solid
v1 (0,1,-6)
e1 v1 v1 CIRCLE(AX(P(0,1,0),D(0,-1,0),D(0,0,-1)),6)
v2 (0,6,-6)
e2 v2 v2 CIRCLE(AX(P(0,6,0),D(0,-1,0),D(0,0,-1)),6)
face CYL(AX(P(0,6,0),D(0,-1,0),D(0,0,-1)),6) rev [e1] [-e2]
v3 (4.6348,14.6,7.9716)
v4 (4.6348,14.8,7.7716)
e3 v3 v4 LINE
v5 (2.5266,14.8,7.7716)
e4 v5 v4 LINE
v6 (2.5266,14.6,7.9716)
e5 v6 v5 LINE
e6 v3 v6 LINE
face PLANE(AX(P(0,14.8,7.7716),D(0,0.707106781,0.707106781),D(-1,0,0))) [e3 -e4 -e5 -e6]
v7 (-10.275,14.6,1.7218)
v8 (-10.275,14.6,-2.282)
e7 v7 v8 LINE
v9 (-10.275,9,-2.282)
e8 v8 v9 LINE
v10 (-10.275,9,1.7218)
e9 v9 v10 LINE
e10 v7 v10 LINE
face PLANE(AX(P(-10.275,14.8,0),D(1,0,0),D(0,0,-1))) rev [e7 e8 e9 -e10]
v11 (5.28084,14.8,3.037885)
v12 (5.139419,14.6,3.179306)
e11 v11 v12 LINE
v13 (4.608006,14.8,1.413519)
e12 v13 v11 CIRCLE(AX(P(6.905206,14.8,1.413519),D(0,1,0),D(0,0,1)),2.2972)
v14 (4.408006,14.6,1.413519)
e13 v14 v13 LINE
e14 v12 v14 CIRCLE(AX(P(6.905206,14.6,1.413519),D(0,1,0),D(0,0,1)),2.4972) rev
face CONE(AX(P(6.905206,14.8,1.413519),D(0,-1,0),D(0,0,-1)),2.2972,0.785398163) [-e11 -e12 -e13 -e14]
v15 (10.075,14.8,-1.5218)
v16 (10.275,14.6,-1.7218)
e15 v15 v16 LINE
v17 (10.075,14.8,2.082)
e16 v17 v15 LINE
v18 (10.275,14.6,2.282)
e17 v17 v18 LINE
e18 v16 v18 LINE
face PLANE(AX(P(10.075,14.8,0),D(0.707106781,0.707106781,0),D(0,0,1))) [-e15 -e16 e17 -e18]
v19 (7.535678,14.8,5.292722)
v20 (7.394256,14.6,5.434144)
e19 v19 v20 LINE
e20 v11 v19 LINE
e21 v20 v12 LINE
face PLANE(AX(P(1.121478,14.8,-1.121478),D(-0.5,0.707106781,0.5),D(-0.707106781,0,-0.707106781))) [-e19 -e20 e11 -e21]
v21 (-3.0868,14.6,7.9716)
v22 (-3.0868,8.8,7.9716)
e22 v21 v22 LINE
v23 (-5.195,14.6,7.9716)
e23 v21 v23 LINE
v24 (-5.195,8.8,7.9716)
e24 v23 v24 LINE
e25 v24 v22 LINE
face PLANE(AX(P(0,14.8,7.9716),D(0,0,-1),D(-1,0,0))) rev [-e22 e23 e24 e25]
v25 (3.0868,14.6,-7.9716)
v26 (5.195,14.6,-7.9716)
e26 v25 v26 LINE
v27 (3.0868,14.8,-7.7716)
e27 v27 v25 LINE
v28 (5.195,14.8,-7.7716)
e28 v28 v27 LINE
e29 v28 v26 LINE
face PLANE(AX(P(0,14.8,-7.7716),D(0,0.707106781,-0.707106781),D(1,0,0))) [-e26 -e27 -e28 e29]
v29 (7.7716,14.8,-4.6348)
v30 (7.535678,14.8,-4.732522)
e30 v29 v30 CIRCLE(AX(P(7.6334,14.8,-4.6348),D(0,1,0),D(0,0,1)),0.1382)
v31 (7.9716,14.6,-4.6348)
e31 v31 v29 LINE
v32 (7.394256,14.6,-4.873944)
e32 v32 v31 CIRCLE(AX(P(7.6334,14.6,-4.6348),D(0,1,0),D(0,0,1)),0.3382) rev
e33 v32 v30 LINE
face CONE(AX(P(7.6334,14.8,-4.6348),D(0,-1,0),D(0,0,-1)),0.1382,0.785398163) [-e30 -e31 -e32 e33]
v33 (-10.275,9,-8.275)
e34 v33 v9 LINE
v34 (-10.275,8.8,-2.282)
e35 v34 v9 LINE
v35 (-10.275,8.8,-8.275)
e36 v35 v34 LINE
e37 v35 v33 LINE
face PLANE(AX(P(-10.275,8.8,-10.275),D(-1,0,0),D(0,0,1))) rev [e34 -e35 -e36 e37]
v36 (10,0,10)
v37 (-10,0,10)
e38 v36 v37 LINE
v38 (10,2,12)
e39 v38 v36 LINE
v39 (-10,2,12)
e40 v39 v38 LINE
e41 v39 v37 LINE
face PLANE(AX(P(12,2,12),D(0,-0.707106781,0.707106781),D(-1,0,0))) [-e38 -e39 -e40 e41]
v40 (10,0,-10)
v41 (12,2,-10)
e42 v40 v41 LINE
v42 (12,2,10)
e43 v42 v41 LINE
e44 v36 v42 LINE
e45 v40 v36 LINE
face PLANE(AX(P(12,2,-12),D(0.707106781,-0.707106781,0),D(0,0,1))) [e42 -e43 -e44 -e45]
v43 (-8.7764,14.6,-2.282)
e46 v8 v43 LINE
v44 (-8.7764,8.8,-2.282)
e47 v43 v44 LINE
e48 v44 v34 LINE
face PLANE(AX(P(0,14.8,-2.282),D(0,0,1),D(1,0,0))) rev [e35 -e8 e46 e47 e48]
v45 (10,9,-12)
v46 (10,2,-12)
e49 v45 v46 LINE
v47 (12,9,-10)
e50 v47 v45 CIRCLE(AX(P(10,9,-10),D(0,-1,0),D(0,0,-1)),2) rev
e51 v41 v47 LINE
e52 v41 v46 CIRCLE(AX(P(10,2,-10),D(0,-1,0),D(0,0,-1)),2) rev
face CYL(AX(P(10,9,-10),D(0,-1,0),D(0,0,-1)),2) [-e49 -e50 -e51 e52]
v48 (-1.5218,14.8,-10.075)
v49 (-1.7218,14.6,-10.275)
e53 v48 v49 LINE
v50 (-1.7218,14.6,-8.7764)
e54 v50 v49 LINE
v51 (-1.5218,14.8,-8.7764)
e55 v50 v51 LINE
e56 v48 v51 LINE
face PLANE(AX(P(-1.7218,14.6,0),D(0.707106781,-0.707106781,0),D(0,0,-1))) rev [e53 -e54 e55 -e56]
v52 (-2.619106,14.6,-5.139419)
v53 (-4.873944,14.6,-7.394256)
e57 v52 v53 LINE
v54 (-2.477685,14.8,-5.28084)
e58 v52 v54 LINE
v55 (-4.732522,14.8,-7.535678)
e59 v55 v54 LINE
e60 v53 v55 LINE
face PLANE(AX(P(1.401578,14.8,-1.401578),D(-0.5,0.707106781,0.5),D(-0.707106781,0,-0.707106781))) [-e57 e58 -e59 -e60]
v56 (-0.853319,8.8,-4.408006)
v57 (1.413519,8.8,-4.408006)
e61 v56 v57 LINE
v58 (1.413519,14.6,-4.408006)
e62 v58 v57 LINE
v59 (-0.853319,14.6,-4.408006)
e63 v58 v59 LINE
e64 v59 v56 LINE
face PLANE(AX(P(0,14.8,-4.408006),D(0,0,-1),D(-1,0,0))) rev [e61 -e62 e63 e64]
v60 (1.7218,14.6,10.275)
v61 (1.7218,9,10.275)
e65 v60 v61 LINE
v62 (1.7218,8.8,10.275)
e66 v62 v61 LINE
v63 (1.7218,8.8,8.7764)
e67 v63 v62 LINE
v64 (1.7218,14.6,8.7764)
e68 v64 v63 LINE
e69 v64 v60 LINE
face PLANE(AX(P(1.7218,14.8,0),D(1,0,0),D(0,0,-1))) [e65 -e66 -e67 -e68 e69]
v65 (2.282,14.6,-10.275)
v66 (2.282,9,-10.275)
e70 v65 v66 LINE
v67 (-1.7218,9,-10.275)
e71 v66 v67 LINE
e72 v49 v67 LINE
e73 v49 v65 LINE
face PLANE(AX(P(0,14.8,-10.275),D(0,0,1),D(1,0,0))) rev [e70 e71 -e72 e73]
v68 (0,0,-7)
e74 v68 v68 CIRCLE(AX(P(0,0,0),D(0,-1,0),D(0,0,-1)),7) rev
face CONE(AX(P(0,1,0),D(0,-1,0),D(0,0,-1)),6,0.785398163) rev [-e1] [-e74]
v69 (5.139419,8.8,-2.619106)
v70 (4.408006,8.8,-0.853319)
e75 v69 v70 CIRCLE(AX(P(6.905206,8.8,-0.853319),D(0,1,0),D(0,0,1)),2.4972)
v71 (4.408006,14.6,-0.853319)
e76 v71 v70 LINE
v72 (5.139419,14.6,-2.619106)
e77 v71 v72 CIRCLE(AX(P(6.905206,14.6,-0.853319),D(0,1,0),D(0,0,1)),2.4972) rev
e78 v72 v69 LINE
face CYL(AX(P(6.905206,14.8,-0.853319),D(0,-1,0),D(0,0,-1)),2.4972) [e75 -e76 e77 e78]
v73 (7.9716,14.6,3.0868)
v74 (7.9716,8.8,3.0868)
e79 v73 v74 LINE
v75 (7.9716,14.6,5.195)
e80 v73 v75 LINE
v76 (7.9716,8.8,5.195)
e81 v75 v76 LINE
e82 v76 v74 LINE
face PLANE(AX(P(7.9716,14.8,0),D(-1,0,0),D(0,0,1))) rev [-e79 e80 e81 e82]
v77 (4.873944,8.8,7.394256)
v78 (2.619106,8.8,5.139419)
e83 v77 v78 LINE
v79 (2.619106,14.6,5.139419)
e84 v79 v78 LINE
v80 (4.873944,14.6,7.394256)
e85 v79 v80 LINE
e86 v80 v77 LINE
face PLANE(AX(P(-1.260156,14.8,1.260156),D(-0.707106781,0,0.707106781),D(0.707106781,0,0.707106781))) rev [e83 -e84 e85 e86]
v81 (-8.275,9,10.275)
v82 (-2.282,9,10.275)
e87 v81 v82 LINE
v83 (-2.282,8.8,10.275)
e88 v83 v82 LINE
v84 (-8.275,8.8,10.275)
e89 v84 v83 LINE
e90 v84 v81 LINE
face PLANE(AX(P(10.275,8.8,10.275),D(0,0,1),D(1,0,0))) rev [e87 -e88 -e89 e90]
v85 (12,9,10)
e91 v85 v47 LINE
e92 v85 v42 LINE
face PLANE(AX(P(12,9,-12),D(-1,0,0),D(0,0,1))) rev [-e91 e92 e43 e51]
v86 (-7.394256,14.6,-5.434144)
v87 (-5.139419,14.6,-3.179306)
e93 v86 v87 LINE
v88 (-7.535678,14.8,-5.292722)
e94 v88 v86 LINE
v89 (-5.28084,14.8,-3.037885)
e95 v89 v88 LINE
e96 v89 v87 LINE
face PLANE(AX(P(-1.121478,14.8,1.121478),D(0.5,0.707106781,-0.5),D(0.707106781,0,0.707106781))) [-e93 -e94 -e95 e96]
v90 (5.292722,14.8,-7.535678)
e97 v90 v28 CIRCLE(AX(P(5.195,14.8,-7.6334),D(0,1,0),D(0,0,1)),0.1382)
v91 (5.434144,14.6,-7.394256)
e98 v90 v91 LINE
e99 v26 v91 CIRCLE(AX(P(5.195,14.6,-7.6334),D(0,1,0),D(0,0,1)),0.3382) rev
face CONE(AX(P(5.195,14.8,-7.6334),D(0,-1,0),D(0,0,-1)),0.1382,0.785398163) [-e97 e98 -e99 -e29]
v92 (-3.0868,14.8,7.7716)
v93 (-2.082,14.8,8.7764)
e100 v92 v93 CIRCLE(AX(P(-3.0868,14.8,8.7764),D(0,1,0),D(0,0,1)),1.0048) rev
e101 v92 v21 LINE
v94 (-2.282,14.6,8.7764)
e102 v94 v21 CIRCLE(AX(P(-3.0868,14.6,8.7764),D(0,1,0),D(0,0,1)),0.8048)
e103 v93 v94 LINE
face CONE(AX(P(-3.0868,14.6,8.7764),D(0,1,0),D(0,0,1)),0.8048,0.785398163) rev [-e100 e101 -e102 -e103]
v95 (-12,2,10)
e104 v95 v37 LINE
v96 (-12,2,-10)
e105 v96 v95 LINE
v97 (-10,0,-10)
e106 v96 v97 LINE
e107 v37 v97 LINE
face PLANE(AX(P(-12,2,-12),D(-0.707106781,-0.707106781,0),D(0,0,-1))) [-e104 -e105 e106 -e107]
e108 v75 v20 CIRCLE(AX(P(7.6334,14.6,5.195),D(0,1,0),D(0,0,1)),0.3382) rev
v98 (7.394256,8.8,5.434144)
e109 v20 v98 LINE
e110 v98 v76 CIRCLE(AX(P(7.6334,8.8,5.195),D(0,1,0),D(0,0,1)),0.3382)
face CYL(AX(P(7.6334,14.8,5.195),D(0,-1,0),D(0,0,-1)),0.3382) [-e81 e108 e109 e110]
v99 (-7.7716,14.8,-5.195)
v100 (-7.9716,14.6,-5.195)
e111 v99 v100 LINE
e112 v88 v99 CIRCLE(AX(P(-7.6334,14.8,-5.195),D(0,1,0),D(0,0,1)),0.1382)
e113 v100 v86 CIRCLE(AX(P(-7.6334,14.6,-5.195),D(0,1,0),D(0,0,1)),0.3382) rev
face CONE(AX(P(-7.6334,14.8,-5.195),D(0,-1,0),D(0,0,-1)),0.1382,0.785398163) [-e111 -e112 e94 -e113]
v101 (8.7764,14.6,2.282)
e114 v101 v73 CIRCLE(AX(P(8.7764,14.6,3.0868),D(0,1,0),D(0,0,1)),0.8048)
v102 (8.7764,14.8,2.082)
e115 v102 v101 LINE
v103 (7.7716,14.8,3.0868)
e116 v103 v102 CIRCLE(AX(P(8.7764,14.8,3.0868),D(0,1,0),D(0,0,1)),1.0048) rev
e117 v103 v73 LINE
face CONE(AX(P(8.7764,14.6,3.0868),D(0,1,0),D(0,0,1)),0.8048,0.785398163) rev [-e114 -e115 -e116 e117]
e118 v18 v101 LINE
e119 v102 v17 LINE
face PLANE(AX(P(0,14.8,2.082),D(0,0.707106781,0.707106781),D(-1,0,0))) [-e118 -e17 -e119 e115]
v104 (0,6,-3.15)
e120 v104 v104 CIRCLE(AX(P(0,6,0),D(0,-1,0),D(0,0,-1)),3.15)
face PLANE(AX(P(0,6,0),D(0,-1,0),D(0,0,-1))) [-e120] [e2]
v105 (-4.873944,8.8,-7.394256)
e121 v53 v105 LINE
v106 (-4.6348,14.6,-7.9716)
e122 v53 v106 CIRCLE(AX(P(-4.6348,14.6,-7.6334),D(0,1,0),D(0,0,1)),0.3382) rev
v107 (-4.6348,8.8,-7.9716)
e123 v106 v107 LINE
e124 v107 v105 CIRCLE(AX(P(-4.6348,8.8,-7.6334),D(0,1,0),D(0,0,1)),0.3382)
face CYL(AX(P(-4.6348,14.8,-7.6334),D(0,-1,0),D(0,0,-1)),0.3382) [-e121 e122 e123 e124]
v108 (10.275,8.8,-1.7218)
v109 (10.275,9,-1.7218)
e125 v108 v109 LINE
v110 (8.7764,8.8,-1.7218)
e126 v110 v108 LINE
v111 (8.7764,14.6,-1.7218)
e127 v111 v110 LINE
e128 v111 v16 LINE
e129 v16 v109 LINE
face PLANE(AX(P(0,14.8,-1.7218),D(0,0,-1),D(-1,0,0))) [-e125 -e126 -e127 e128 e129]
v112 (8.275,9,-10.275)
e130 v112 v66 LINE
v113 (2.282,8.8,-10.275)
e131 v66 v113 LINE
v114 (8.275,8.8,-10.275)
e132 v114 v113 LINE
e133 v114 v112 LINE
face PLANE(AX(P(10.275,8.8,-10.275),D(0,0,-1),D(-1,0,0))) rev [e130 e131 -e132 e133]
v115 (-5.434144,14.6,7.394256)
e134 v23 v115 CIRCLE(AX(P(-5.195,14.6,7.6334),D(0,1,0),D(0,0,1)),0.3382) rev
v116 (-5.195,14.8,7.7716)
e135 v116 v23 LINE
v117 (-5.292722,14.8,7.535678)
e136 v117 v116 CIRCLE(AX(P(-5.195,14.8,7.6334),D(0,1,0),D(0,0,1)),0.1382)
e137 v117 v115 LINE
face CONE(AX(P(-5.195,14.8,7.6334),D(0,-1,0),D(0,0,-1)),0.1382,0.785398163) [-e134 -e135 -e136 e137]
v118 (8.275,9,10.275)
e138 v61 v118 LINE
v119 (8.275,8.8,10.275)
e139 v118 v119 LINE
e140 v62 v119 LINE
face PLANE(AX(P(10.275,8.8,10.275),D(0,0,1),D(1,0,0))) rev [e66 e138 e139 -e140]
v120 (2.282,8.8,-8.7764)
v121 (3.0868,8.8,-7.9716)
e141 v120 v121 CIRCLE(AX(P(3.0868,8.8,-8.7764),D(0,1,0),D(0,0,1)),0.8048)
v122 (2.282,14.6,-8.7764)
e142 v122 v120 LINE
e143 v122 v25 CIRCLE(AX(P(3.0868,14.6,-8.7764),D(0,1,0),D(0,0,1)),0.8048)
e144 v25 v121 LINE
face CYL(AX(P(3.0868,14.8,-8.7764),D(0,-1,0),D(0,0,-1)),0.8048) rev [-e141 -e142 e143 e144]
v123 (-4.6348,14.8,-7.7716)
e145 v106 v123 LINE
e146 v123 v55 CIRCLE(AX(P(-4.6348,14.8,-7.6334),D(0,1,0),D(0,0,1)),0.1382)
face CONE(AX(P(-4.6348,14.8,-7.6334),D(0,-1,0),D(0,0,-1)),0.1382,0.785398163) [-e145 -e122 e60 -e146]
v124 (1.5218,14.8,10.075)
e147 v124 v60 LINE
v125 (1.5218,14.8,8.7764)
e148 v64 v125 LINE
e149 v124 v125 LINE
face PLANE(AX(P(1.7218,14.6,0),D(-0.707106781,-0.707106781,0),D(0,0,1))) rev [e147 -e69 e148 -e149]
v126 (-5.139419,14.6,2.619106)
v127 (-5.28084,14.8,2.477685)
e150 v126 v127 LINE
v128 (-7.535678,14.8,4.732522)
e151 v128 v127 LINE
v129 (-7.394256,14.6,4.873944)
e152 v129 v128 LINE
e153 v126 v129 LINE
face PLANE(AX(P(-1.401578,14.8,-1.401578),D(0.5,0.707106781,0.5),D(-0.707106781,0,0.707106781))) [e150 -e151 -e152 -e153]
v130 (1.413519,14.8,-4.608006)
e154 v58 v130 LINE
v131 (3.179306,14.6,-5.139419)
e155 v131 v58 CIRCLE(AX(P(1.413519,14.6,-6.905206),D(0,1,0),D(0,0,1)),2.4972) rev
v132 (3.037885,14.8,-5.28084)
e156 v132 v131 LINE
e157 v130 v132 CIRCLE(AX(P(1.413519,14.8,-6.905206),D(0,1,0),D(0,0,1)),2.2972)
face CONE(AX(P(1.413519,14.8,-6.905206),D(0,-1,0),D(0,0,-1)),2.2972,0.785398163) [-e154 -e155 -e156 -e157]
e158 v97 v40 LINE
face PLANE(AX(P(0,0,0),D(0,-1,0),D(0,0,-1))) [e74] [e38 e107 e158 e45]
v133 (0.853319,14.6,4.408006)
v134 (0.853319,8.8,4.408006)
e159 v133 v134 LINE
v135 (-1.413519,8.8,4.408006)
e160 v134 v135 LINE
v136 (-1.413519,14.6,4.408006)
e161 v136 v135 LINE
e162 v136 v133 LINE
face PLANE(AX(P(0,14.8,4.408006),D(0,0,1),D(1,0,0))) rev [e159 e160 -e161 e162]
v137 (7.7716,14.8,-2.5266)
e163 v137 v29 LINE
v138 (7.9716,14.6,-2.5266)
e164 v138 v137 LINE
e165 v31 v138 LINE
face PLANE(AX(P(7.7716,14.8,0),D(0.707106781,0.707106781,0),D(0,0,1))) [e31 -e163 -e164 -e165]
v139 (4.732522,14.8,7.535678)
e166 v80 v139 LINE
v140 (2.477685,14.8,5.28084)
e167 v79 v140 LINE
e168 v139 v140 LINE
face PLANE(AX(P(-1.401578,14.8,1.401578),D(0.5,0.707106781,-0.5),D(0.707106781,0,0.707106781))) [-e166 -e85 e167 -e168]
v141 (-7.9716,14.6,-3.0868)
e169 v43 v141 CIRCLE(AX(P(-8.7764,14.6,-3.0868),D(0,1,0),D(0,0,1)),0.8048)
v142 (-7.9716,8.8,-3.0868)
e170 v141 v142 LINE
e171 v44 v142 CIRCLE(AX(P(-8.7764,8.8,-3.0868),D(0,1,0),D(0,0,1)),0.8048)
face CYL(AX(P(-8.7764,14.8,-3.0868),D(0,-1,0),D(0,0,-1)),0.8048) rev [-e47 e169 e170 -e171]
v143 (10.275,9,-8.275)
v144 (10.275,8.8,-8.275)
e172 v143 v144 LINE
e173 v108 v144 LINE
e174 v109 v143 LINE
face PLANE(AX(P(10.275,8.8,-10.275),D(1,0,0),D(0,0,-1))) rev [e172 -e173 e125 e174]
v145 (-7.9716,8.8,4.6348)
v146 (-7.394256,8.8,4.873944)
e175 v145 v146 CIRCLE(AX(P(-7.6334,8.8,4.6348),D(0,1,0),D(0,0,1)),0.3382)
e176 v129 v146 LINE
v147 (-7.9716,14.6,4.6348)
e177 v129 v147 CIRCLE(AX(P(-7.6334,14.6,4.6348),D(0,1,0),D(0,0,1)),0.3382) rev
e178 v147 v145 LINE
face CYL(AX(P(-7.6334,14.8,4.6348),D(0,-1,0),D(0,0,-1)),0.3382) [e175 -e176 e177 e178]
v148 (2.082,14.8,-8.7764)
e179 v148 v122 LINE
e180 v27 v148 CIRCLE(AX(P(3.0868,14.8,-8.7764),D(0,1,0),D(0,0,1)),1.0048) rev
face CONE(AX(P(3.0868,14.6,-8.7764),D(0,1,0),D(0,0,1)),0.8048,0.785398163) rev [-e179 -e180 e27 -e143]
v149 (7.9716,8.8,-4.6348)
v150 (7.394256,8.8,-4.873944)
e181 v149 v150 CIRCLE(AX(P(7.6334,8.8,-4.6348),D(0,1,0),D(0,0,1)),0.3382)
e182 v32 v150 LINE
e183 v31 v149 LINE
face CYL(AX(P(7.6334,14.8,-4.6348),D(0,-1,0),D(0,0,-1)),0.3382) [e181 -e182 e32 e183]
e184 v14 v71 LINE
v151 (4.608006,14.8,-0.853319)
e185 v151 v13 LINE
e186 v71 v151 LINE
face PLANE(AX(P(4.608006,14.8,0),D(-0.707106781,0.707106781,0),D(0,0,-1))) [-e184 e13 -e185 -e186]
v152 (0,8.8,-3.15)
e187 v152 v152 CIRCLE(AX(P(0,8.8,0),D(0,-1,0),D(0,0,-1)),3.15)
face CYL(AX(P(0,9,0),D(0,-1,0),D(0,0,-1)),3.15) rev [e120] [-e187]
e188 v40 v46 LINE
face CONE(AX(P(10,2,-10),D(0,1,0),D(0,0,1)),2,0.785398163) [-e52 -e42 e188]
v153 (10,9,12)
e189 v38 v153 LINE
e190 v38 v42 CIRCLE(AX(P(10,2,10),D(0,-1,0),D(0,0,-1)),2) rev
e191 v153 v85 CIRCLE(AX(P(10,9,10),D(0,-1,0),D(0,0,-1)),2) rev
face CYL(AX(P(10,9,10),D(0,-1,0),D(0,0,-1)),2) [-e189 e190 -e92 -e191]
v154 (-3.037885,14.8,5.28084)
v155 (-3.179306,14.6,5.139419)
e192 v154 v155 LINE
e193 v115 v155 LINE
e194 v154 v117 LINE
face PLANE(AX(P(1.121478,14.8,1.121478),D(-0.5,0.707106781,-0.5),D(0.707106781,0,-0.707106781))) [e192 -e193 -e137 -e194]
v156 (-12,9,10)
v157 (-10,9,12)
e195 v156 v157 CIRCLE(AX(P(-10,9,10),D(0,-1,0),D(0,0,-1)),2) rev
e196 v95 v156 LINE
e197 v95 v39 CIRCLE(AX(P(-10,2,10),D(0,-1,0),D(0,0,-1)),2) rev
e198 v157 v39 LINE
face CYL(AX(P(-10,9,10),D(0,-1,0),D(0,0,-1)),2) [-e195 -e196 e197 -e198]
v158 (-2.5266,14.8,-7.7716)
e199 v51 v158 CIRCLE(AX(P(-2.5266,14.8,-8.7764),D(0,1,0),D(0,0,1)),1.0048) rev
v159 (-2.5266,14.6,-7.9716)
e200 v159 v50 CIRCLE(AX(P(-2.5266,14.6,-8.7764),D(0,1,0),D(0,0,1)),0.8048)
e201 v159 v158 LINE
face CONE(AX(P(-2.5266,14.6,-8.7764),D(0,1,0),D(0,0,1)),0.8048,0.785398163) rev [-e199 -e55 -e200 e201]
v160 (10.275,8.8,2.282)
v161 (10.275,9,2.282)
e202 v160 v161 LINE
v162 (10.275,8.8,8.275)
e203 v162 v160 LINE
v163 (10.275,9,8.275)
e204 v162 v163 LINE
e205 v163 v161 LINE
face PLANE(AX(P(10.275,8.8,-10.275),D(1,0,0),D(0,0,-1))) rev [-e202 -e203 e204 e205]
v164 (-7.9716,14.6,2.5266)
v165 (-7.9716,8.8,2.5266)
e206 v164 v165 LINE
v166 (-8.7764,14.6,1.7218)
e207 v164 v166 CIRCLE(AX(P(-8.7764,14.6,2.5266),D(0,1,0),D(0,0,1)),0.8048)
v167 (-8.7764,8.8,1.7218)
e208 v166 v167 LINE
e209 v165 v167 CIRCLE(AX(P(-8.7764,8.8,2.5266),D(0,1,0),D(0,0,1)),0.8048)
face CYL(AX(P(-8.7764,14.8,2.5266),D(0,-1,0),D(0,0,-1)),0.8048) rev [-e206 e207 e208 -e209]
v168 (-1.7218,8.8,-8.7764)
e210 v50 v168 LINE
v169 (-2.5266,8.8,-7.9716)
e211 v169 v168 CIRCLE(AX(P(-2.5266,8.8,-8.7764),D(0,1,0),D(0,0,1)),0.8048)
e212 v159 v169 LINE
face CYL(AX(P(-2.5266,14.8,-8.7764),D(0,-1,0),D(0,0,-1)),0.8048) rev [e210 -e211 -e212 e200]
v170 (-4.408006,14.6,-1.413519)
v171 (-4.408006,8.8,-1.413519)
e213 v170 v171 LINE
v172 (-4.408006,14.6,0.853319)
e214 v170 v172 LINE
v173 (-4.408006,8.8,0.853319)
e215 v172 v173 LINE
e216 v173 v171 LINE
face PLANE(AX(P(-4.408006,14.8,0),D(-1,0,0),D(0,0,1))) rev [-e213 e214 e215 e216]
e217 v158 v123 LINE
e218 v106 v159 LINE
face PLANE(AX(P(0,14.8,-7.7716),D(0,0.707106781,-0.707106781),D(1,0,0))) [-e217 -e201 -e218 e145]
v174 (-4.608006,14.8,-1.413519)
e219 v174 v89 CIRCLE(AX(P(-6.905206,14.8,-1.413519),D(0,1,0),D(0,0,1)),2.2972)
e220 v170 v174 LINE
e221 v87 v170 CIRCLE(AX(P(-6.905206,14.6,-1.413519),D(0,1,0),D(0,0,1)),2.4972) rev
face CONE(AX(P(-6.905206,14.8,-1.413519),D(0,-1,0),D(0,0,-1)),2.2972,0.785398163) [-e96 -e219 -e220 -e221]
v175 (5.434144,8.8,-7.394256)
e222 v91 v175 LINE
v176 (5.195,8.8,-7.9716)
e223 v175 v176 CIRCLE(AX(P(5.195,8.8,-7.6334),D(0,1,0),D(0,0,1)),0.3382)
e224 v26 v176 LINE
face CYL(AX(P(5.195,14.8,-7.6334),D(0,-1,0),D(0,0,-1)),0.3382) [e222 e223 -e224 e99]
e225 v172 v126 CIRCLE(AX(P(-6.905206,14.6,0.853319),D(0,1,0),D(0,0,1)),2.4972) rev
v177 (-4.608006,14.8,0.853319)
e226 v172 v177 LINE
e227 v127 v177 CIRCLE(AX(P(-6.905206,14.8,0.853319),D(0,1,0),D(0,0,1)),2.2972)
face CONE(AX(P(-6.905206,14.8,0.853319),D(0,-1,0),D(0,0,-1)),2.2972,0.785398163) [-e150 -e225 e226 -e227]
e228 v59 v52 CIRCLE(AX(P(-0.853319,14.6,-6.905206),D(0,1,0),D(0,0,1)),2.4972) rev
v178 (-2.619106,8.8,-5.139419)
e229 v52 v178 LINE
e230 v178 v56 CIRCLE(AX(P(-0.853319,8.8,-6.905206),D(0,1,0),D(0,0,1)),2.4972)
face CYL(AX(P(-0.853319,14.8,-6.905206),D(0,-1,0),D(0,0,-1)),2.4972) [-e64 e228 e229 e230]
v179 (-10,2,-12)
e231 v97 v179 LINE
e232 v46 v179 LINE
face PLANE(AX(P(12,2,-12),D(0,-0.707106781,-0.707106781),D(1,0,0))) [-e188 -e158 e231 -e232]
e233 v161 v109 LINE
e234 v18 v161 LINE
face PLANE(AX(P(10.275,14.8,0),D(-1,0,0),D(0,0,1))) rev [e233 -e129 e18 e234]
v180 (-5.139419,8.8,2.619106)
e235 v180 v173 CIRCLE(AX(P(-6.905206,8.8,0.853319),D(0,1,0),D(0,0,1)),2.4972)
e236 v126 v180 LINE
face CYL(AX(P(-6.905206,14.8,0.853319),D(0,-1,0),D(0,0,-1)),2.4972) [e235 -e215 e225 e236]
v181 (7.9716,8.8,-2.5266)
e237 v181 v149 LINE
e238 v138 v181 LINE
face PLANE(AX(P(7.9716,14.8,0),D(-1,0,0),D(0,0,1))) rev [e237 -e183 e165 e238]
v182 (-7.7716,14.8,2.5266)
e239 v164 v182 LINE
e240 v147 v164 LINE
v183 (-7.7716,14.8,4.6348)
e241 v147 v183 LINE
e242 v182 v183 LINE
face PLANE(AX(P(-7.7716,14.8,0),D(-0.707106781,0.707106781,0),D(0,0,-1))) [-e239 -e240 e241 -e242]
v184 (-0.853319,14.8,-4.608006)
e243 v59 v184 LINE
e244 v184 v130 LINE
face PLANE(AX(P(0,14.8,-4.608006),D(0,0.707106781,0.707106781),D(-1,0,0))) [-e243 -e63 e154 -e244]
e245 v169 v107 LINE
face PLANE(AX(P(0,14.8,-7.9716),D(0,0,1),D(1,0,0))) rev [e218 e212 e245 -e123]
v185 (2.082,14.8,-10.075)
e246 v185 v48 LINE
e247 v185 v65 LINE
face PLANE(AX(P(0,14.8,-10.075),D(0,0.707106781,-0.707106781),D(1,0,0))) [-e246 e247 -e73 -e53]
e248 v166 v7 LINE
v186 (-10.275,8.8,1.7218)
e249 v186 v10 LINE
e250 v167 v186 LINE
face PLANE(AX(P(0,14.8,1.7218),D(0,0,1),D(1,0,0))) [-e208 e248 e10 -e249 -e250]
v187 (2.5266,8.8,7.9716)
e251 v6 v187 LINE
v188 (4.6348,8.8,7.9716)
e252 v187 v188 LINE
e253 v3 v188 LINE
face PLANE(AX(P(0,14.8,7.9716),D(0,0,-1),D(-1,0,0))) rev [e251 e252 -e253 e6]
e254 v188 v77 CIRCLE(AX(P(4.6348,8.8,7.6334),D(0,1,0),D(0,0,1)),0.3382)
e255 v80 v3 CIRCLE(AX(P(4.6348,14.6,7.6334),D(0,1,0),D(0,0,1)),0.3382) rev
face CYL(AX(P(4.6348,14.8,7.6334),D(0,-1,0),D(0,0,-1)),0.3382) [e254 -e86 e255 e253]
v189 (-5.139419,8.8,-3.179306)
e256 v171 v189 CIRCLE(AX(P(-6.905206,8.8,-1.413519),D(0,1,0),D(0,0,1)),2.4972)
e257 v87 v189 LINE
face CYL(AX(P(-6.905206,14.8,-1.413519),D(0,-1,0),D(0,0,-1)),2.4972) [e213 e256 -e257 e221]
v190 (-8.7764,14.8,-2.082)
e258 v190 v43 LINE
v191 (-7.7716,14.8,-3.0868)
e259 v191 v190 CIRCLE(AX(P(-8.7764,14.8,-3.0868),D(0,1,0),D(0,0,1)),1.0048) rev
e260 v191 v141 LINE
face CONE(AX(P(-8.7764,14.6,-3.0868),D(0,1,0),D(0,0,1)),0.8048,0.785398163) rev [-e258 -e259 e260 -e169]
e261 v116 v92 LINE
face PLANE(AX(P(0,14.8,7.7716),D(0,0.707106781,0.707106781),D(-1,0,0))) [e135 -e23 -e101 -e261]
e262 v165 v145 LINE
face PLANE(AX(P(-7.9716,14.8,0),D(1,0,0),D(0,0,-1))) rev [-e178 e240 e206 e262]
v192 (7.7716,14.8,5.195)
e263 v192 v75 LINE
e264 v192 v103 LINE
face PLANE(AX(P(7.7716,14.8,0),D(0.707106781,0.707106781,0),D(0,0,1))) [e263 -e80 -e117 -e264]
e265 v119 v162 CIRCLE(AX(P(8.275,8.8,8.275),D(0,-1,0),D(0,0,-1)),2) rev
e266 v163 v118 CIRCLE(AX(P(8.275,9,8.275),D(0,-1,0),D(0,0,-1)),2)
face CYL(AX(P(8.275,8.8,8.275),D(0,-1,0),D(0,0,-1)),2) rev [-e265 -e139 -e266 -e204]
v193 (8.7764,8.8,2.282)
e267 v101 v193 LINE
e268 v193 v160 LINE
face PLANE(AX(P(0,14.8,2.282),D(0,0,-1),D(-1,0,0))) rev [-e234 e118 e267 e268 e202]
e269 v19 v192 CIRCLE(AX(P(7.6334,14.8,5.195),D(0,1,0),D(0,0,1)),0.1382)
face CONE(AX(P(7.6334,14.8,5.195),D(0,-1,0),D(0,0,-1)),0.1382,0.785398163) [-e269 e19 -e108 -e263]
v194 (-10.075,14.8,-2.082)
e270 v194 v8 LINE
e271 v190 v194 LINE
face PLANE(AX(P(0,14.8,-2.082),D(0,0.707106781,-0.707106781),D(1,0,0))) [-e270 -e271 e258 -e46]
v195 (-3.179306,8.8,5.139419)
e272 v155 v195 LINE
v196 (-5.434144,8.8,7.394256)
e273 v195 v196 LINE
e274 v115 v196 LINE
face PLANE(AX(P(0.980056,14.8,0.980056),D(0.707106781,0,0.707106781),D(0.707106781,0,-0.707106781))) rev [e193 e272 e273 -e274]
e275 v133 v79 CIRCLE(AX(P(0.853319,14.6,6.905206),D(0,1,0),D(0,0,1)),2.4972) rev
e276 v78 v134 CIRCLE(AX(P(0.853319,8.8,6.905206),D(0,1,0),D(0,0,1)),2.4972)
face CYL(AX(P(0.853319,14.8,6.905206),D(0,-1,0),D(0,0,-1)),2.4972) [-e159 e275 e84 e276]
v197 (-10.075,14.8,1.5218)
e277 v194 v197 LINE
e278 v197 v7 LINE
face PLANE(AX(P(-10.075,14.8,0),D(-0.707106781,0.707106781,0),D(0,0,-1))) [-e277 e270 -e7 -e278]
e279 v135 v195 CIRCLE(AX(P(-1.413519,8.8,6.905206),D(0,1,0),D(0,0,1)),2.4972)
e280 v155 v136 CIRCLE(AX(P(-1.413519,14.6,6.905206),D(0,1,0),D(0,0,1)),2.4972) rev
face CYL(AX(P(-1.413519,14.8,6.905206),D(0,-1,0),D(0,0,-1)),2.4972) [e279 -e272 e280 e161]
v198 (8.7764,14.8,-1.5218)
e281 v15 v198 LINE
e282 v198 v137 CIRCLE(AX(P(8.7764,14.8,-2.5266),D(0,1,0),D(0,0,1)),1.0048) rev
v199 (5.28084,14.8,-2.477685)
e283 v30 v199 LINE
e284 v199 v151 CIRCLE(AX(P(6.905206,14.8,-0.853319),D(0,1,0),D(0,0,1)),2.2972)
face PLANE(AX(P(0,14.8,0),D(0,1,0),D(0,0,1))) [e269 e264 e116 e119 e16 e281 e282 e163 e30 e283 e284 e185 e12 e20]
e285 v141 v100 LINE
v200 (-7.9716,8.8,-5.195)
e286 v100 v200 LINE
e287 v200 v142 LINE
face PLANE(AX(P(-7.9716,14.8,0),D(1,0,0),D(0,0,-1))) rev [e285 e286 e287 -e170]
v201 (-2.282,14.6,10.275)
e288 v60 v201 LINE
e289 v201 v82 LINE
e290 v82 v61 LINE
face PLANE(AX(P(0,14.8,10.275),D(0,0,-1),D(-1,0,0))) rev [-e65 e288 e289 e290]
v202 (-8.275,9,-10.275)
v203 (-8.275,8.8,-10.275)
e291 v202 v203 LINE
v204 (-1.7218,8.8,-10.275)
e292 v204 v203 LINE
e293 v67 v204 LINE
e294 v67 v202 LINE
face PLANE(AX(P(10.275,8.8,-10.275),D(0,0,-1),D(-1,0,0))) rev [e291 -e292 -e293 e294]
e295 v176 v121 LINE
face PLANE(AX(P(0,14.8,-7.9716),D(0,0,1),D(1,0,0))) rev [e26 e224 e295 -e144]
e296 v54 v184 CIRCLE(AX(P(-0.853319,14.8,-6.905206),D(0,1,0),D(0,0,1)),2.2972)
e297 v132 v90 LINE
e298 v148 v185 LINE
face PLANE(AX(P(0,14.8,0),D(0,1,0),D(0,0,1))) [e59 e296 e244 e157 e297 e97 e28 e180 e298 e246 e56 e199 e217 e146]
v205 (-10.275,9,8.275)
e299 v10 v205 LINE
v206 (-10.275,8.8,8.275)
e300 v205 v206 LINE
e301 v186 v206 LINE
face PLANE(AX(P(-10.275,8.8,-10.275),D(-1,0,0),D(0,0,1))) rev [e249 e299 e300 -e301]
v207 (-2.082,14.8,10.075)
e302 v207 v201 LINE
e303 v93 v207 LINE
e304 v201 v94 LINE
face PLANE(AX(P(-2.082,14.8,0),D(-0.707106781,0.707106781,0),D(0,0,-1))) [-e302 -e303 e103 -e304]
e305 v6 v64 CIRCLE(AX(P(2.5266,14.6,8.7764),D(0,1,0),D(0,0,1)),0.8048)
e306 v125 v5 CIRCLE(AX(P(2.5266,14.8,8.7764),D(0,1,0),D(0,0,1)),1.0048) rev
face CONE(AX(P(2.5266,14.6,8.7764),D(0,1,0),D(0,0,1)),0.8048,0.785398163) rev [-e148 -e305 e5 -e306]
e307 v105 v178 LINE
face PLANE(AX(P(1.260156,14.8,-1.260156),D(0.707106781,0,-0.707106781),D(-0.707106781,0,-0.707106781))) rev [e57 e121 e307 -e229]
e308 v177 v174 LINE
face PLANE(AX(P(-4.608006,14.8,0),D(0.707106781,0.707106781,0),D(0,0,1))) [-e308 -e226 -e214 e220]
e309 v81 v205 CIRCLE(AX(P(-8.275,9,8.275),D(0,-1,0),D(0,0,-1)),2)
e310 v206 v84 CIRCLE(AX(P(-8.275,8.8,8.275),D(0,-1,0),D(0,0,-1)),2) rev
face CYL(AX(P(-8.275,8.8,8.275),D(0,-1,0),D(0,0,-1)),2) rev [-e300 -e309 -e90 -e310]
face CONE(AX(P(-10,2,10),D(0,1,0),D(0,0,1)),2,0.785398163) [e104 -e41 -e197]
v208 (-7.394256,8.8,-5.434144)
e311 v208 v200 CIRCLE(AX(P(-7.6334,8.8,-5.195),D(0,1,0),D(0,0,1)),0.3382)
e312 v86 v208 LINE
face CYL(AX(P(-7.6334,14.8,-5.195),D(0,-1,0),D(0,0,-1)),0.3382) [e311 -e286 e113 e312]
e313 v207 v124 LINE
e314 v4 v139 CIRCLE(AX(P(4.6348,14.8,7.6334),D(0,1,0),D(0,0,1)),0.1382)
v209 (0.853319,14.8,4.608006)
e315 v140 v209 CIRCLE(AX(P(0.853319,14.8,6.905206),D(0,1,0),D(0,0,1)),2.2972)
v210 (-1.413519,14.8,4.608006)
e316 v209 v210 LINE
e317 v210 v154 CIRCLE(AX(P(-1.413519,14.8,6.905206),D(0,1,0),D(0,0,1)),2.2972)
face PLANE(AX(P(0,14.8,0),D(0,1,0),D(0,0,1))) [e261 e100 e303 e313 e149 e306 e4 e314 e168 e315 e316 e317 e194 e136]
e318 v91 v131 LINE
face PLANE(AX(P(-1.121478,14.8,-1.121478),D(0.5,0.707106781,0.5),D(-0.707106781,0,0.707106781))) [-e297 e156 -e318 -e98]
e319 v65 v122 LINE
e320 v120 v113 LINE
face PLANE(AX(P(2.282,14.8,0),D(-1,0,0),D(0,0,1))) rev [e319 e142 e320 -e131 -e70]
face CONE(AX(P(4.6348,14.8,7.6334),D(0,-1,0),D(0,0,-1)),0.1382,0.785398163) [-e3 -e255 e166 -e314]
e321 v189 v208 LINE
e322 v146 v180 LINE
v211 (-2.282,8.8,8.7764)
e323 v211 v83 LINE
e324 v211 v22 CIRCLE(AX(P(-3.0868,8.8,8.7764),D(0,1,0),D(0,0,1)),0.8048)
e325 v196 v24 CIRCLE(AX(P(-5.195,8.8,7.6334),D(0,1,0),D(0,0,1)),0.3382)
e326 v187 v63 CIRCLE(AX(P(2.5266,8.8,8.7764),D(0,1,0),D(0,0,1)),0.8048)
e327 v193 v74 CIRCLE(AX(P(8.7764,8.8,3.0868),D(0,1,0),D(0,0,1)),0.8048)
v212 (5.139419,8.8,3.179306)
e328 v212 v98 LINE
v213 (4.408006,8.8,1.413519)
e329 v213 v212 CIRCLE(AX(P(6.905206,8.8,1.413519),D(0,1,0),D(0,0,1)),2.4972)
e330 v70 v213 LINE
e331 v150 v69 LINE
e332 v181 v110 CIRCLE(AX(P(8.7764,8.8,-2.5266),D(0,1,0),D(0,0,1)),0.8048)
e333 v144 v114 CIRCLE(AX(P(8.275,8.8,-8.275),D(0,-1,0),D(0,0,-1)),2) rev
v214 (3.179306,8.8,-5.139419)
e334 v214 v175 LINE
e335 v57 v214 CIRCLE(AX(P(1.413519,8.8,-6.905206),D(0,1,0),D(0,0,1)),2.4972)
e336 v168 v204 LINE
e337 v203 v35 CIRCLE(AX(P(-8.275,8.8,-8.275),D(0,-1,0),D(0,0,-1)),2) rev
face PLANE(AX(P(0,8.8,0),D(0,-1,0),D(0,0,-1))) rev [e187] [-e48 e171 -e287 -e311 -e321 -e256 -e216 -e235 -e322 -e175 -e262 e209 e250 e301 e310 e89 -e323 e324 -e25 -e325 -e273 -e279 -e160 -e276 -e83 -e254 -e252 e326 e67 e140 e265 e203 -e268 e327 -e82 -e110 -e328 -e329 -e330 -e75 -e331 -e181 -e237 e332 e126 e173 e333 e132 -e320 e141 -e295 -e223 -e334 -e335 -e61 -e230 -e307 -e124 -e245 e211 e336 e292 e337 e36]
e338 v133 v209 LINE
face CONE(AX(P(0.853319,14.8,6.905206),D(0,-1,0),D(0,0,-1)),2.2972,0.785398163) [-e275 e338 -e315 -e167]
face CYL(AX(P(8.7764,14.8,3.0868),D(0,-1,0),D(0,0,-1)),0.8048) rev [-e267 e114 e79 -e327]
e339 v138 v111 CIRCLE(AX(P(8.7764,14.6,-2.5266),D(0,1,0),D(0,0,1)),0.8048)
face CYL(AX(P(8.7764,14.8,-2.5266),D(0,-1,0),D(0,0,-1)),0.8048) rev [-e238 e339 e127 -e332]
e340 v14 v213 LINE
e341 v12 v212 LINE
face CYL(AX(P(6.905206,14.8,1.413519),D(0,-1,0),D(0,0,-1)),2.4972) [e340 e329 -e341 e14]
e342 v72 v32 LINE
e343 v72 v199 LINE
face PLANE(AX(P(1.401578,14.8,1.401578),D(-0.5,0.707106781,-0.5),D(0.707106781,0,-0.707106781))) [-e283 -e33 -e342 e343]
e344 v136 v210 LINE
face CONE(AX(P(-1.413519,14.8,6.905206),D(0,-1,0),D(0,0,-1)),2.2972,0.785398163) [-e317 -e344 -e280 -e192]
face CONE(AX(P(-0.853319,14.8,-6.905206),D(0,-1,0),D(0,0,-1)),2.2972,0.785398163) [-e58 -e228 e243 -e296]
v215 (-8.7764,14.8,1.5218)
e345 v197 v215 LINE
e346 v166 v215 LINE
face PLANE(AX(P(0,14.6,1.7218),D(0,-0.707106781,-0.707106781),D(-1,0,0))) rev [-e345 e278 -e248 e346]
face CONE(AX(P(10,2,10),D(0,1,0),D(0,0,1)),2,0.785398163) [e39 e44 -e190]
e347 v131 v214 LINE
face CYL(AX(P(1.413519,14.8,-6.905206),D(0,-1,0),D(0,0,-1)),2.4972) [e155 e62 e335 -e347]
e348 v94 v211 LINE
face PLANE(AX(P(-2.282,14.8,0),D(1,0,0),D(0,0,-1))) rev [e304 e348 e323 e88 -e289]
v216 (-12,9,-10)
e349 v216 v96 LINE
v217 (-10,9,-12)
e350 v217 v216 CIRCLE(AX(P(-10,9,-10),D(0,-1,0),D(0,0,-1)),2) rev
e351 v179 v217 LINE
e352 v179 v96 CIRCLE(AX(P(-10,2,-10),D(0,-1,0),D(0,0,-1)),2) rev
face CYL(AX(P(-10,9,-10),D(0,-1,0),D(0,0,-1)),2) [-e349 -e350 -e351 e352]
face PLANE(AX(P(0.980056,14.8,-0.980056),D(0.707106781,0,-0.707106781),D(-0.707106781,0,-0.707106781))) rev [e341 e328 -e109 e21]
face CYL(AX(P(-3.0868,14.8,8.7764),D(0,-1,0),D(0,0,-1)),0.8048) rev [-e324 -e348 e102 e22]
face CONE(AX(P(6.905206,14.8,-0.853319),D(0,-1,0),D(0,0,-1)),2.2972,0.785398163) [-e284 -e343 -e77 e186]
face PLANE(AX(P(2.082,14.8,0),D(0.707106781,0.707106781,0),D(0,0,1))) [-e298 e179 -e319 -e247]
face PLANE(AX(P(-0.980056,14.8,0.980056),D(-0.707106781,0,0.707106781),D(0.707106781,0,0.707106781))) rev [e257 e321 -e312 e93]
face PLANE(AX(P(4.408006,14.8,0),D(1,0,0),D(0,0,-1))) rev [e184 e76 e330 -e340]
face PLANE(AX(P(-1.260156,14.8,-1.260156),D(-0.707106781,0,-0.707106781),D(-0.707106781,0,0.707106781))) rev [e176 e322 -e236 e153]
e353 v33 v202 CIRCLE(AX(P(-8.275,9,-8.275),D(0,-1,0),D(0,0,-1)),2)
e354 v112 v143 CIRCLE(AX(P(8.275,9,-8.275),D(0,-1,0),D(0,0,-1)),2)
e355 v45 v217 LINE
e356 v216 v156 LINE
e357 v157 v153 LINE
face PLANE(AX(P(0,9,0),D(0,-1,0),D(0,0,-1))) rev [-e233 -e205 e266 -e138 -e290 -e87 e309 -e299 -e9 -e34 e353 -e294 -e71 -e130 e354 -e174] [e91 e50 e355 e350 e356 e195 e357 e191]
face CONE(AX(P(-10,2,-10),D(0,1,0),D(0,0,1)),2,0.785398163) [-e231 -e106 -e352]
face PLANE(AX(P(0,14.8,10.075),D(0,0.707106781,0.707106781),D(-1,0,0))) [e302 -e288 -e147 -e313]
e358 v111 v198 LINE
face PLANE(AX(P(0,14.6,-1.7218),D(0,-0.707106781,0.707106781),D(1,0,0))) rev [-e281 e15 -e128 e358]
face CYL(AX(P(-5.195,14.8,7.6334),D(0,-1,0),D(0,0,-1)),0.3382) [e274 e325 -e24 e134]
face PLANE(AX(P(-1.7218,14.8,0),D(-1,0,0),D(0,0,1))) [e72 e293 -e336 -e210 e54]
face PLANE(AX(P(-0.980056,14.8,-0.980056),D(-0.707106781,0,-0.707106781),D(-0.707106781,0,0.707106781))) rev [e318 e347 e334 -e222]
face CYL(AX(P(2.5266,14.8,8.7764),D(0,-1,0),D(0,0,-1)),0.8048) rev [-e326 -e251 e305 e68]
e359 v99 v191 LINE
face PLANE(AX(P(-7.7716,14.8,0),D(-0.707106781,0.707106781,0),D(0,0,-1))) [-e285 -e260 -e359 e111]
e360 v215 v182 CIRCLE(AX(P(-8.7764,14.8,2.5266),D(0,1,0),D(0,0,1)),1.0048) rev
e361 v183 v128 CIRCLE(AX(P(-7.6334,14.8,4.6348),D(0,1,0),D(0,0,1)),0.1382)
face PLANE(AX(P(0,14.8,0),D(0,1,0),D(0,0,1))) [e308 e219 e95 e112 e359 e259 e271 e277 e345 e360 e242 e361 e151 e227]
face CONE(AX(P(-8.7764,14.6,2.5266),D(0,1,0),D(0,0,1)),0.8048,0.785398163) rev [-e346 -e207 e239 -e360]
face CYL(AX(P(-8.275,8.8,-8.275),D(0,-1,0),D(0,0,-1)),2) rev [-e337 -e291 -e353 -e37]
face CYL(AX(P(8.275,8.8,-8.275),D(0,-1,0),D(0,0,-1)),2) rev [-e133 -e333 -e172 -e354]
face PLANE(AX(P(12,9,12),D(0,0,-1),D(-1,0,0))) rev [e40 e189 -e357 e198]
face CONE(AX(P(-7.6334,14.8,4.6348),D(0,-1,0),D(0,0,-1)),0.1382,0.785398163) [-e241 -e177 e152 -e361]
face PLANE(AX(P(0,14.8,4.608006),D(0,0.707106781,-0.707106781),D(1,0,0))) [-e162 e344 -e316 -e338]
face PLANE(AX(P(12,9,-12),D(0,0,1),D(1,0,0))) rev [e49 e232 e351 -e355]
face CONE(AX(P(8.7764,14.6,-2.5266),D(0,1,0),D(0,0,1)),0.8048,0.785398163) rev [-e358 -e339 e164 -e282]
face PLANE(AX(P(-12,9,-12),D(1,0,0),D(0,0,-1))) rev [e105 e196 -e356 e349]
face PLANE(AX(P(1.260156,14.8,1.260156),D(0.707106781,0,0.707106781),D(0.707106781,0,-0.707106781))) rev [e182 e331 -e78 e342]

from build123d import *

# Parameters (mm, degrees)
SKETCH1_W           = 24
SKETCH1_H           = 24
SKETCH1_R           = 3.15
BOSS_EXTRUDE1_DEPTH = 9
SKETCH2_W           = 20.55
SKETCH2_H           = 20.55
CUT_EXTRUDE1_DEPTH  = 0.2
SKETCH4_R           = 6
CUT_EXTRUDE2_DEPTH  = 6
FILLET1_R           = 2
CHAMFER1_SIZE       = 2
CHAMFER2_SIZE       = 1
BOSS_EXTRUDE2_DEPTH = 6
CHAMFER3_SIZE       = 0.2


with BuildPart() as part:
    # Sketch1 → Boss-Extrude1 (new body)
    with BuildSketch(Plane(origin=(0, 0, 0), x_dir=(1, 0, 0), z_dir=(0, 1, 0))):
        Rectangle(SKETCH1_W, SKETCH1_H)
        with Locations(Location((0, 0, 0), (0, 0, 270))):
            Circle(SKETCH1_R, mode=Mode.SUBTRACT)
    extrude(amount=BOSS_EXTRUDE1_DEPTH)

    # Sketch2 → Cut-Extrude1 (cut)
    with BuildSketch(Plane(origin=(0, 9, 0), x_dir=(1, 0, 0), z_dir=(0, 1, 0))):
        Rectangle(SKETCH2_W, SKETCH2_H)
    extrude(amount=-CUT_EXTRUDE1_DEPTH, mode=Mode.SUBTRACT)

    # Sketch4 → Cut-Extrude2 (cut)
    with BuildSketch(Plane.XZ):
        with Locations(Location((0, 0, 0), (0, 0, 270))):
            Circle(SKETCH4_R)
    extrude(amount=-CUT_EXTRUDE2_DEPTH, mode=Mode.SUBTRACT)

    # Fillet1
    fillet1_edges = [part.edges().sort_by_distance(p)[0] for p in [
        (-10.275, 8.9, 10.275),
        (-10.275, 8.9, -10.275),
        (10.275, 8.9, -10.275),
        (10.275, 8.9, 10.275),
        (-12, 4.5, -12),
        (12, 4.5, -12),
        (12, 4.5, 12),
        (-12, 4.5, 12),
    ]]
    fillet(fillet1_edges, radius=FILLET1_R)

    # Chamfer1
    chamfer1_edges = [part.edges().sort_by_distance(p)[0] for p in [
        (12, 0, 0),
        (-12, 0, 0),
        (0, 0, -12),
        (0, 0, 12),
        (11.414213562, 0, -11.414213562),
        (-11.414213562, 0, -11.414213562),
        (-11.414213562, 0, 11.414213562),
        (11.414213562, 0, 11.414213562),
    ]]
    chamfer(chamfer1_edges, length=CHAMFER1_SIZE - 0.0001)  # a hair under: the kernel refuses the full size

    # Chamfer2
    chamfer2_edges = [part.edges().sort_by_distance(p)[0] for p in [
        (0, 0, 6),
    ]]
    chamfer(chamfer2_edges, length=CHAMFER2_SIZE)

    # Sketch5 → Boss-Extrude2 (add)
    with BuildSketch(Plane(origin=(0, 8.8, 0), x_dir=(1, 0, 0), z_dir=(0, 1, 0))):
        with BuildLine():
            Line((7.9716, -5.195), (7.9716, -3.0868))
            ThreePointArc((7.9716, -3.0868), (8.207320463, -2.517720463), (8.7764, -2.282))
            Line((8.7764, -2.282), (10.275, -2.282))
            Line((10.275, -2.282), (10.275, 1.7218))
            Line((10.275, 1.7218), (8.7764, 1.7218))
            ThreePointArc((8.7764, 1.7218), (8.207320463, 1.957520463), (7.9716, 2.5266))
            Line((7.9716, 2.5266), (7.9716, 4.6348))
            ThreePointArc((7.9716, 4.6348), (7.762823537, 4.947256058), (7.394256487, 4.873943513))
            Line((7.394256487, 4.873943513), (5.139419138, 2.619106165))
            ThreePointArc((5.139419138, 2.619106165), (4.598094223, 1.808956178), (4.408006192, 0.853319111))
            Line((4.408006192, 0.853319111), (4.408006192, -1.413519111))
            ThreePointArc((4.408006192, -1.413519111), (4.598094223, -2.369156178), (5.139419138, -3.179306165))
            Line((5.139419138, -3.179306165), (7.394256487, -5.434143513))
            ThreePointArc((7.394256487, -5.434143513), (7.762823537, -5.507456058), (7.9716, -5.195))
        make_face()
        with BuildLine():
            Line((1.7218, -10.275), (-2.282, -10.275))
            Line((-2.282, -10.275), (-2.282, -8.7764))
            ThreePointArc((-2.282, -8.7764), (-2.517720463, -8.207320463), (-3.0868, -7.9716))
            Line((-3.0868, -7.9716), (-5.195, -7.9716))
            ThreePointArc((-5.195, -7.9716), (-5.507456058, -7.762823537), (-5.434143513, -7.394256487))
            Line((-5.434143513, -7.394256487), (-3.179306165, -5.139419138))
            ThreePointArc((-3.179306165, -5.139419138), (-2.369156178, -4.598094223), (-1.413519111, -4.408006192))
            Line((-1.413519111, -4.408006192), (0.853319111, -4.408006192))
            ThreePointArc((0.853319111, -4.408006192), (1.808956178, -4.598094223), (2.619106165, -5.139419138))
            Line((2.619106165, -5.139419138), (4.873943513, -7.394256487))
            ThreePointArc((4.873943513, -7.394256487), (4.947256058, -7.762823537), (4.6348, -7.9716))
            Line((4.6348, -7.9716), (2.5266, -7.9716))
            ThreePointArc((2.5266, -7.9716), (1.957520463, -8.207320463), (1.7218, -8.7764))
            Line((1.7218, -8.7764), (1.7218, -10.275))
        make_face()
        with BuildLine():
            Line((-10.275, -1.7218), (-10.275, 2.282))
            Line((-10.275, 2.282), (-8.7764, 2.282))
            ThreePointArc((-8.7764, 2.282), (-8.207320463, 2.517720463), (-7.9716, 3.0868))
            Line((-7.9716, 3.0868), (-7.9716, 5.195))
            ThreePointArc((-7.9716, 5.195), (-7.762823537, 5.507456058), (-7.394256487, 5.434143513))
            Line((-7.394256487, 5.434143513), (-5.139419138, 3.179306165))
            ThreePointArc((-5.139419138, 3.179306165), (-4.598094223, 2.369156178), (-4.408006192, 1.413519111))
            Line((-4.408006192, 1.413519111), (-4.408006192, -0.853319111))
            ThreePointArc((-4.408006192, -0.853319111), (-4.598094223, -1.808956178), (-5.139419138, -2.619106165))
            Line((-5.139419138, -2.619106165), (-7.394256487, -4.873943513))
            ThreePointArc((-7.394256487, -4.873943513), (-7.762823537, -4.947256058), (-7.9716, -4.6348))
            Line((-7.9716, -4.6348), (-7.9716, -2.5266))
            ThreePointArc((-7.9716, -2.5266), (-8.207320463, -1.957520463), (-8.7764, -1.7218))
            Line((-8.7764, -1.7218), (-10.275, -1.7218))
        make_face()
        with BuildLine():
            Line((-1.7218, 10.275), (2.282, 10.275))
            Line((2.282, 10.275), (2.282, 8.7764))
            ThreePointArc((2.282, 8.7764), (2.517720463, 8.207320463), (3.0868, 7.9716))
            Line((3.0868, 7.9716), (5.195, 7.9716))
            ThreePointArc((5.195, 7.9716), (5.507456058, 7.762823537), (5.434143513, 7.394256487))
            Line((5.434143513, 7.394256487), (3.179306165, 5.139419138))
            ThreePointArc((3.179306165, 5.139419138), (2.369156178, 4.598094223), (1.413519111, 4.408006192))
            Line((1.413519111, 4.408006192), (-0.853319111, 4.408006192))
            ThreePointArc((-0.853319111, 4.408006192), (-1.808956178, 4.598094223), (-2.619106165, 5.139419138))
            Line((-2.619106165, 5.139419138), (-4.873943513, 7.394256487))
            ThreePointArc((-4.873943513, 7.394256487), (-4.947256058, 7.762823537), (-4.6348, 7.9716))
            Line((-4.6348, 7.9716), (-2.5266, 7.9716))
            ThreePointArc((-2.5266, 7.9716), (-1.957520463, 8.207320463), (-1.7218, 8.7764))
            Line((-1.7218, 8.7764), (-1.7218, 10.275))
        make_face()
    extrude(amount=BOSS_EXTRUDE2_DEPTH)

    # Chamfer3
    chamfer3_edges = [part.edges().sort_by_distance(p)[0] for p in [
        (-1.957520463, 14.8, -8.207320463),
        (2.517720463, 14.8, -8.207320463),
        (-1.7218, 14.8, -9.5257),
        (-3.5807, 14.8, -7.9716),
        (-4.947256058, 14.8, -7.762823537),
        (-3.746524839, 14.8, -6.266837812),
        (-1.808956178, 14.8, -4.598094223),
        (0.2801, 14.8, -4.408006192),
        (2.369156178, 14.8, -4.598094223),
        (4.306724839, 14.8, -6.266837812),
        (5.507456058, 14.8, -7.762823537),
        (4.1409, 14.8, -7.9716),
        (2.282, 14.8, -9.5257),
        (0.2801, 14.8, -10.275),
        (-8.207320463, 14.8, 1.957520463),
        (-8.207320463, 14.8, -2.517720463),
        (-9.5257, 14.8, 1.7218),
        (-7.9716, 14.8, 3.5807),
        (-7.762823537, 14.8, 4.947256058),
        (-6.266837812, 14.8, 3.746524839),
        (-4.598094223, 14.8, 1.808956178),
        (-4.408006192, 14.8, -0.2801),
        (-4.598094223, 14.8, -2.369156178),
        (-6.266837812, 14.8, -4.306724839),
        (-7.762823537, 14.8, -5.507456058),
        (-7.9716, 14.8, -4.1409),
        (-9.5257, 14.8, -2.282),
        (-10.275, 14.8, -0.2801),
        (1.957520463, 14.8, 8.207320463),
        (-2.517720463, 14.8, 8.207320463),
        (1.7218, 14.8, 9.5257),
        (3.5807, 14.8, 7.9716),
        (4.947256058, 14.8, 7.762823537),
        (3.746524839, 14.8, 6.266837812),
        (1.808956178, 14.8, 4.598094223),
        (-0.2801, 14.8, 4.408006192),
        (-2.369156178, 14.8, 4.598094223),
        (-4.306724839, 14.8, 6.266837812),
        (-5.507456058, 14.8, 7.762823537),
        (-4.1409, 14.8, 7.9716),
        (-2.282, 14.8, 9.5257),
        (-0.2801, 14.8, 10.275),
        (8.207320463, 14.8, -1.957520463),
        (8.207320463, 14.8, 2.517720463),
        (9.5257, 14.8, -1.7218),
        (7.9716, 14.8, -3.5807),
        (7.762823537, 14.8, -4.947256058),
        (6.266837812, 14.8, -3.746524839),
        (4.598094223, 14.8, -1.808956178),
        (4.408006192, 14.8, 0.2801),
        (4.598094223, 14.8, 2.369156178),
        (6.266837812, 14.8, 4.306724839),
        (7.762823537, 14.8, 5.507456058),
        (7.9716, 14.8, 4.1409),
        (9.5257, 14.8, 2.282),
        (10.275, 14.8, 0.2801),
    ]]
    chamfer(chamfer3_edges, length=CHAMFER3_SIZE)


solid = part.part
